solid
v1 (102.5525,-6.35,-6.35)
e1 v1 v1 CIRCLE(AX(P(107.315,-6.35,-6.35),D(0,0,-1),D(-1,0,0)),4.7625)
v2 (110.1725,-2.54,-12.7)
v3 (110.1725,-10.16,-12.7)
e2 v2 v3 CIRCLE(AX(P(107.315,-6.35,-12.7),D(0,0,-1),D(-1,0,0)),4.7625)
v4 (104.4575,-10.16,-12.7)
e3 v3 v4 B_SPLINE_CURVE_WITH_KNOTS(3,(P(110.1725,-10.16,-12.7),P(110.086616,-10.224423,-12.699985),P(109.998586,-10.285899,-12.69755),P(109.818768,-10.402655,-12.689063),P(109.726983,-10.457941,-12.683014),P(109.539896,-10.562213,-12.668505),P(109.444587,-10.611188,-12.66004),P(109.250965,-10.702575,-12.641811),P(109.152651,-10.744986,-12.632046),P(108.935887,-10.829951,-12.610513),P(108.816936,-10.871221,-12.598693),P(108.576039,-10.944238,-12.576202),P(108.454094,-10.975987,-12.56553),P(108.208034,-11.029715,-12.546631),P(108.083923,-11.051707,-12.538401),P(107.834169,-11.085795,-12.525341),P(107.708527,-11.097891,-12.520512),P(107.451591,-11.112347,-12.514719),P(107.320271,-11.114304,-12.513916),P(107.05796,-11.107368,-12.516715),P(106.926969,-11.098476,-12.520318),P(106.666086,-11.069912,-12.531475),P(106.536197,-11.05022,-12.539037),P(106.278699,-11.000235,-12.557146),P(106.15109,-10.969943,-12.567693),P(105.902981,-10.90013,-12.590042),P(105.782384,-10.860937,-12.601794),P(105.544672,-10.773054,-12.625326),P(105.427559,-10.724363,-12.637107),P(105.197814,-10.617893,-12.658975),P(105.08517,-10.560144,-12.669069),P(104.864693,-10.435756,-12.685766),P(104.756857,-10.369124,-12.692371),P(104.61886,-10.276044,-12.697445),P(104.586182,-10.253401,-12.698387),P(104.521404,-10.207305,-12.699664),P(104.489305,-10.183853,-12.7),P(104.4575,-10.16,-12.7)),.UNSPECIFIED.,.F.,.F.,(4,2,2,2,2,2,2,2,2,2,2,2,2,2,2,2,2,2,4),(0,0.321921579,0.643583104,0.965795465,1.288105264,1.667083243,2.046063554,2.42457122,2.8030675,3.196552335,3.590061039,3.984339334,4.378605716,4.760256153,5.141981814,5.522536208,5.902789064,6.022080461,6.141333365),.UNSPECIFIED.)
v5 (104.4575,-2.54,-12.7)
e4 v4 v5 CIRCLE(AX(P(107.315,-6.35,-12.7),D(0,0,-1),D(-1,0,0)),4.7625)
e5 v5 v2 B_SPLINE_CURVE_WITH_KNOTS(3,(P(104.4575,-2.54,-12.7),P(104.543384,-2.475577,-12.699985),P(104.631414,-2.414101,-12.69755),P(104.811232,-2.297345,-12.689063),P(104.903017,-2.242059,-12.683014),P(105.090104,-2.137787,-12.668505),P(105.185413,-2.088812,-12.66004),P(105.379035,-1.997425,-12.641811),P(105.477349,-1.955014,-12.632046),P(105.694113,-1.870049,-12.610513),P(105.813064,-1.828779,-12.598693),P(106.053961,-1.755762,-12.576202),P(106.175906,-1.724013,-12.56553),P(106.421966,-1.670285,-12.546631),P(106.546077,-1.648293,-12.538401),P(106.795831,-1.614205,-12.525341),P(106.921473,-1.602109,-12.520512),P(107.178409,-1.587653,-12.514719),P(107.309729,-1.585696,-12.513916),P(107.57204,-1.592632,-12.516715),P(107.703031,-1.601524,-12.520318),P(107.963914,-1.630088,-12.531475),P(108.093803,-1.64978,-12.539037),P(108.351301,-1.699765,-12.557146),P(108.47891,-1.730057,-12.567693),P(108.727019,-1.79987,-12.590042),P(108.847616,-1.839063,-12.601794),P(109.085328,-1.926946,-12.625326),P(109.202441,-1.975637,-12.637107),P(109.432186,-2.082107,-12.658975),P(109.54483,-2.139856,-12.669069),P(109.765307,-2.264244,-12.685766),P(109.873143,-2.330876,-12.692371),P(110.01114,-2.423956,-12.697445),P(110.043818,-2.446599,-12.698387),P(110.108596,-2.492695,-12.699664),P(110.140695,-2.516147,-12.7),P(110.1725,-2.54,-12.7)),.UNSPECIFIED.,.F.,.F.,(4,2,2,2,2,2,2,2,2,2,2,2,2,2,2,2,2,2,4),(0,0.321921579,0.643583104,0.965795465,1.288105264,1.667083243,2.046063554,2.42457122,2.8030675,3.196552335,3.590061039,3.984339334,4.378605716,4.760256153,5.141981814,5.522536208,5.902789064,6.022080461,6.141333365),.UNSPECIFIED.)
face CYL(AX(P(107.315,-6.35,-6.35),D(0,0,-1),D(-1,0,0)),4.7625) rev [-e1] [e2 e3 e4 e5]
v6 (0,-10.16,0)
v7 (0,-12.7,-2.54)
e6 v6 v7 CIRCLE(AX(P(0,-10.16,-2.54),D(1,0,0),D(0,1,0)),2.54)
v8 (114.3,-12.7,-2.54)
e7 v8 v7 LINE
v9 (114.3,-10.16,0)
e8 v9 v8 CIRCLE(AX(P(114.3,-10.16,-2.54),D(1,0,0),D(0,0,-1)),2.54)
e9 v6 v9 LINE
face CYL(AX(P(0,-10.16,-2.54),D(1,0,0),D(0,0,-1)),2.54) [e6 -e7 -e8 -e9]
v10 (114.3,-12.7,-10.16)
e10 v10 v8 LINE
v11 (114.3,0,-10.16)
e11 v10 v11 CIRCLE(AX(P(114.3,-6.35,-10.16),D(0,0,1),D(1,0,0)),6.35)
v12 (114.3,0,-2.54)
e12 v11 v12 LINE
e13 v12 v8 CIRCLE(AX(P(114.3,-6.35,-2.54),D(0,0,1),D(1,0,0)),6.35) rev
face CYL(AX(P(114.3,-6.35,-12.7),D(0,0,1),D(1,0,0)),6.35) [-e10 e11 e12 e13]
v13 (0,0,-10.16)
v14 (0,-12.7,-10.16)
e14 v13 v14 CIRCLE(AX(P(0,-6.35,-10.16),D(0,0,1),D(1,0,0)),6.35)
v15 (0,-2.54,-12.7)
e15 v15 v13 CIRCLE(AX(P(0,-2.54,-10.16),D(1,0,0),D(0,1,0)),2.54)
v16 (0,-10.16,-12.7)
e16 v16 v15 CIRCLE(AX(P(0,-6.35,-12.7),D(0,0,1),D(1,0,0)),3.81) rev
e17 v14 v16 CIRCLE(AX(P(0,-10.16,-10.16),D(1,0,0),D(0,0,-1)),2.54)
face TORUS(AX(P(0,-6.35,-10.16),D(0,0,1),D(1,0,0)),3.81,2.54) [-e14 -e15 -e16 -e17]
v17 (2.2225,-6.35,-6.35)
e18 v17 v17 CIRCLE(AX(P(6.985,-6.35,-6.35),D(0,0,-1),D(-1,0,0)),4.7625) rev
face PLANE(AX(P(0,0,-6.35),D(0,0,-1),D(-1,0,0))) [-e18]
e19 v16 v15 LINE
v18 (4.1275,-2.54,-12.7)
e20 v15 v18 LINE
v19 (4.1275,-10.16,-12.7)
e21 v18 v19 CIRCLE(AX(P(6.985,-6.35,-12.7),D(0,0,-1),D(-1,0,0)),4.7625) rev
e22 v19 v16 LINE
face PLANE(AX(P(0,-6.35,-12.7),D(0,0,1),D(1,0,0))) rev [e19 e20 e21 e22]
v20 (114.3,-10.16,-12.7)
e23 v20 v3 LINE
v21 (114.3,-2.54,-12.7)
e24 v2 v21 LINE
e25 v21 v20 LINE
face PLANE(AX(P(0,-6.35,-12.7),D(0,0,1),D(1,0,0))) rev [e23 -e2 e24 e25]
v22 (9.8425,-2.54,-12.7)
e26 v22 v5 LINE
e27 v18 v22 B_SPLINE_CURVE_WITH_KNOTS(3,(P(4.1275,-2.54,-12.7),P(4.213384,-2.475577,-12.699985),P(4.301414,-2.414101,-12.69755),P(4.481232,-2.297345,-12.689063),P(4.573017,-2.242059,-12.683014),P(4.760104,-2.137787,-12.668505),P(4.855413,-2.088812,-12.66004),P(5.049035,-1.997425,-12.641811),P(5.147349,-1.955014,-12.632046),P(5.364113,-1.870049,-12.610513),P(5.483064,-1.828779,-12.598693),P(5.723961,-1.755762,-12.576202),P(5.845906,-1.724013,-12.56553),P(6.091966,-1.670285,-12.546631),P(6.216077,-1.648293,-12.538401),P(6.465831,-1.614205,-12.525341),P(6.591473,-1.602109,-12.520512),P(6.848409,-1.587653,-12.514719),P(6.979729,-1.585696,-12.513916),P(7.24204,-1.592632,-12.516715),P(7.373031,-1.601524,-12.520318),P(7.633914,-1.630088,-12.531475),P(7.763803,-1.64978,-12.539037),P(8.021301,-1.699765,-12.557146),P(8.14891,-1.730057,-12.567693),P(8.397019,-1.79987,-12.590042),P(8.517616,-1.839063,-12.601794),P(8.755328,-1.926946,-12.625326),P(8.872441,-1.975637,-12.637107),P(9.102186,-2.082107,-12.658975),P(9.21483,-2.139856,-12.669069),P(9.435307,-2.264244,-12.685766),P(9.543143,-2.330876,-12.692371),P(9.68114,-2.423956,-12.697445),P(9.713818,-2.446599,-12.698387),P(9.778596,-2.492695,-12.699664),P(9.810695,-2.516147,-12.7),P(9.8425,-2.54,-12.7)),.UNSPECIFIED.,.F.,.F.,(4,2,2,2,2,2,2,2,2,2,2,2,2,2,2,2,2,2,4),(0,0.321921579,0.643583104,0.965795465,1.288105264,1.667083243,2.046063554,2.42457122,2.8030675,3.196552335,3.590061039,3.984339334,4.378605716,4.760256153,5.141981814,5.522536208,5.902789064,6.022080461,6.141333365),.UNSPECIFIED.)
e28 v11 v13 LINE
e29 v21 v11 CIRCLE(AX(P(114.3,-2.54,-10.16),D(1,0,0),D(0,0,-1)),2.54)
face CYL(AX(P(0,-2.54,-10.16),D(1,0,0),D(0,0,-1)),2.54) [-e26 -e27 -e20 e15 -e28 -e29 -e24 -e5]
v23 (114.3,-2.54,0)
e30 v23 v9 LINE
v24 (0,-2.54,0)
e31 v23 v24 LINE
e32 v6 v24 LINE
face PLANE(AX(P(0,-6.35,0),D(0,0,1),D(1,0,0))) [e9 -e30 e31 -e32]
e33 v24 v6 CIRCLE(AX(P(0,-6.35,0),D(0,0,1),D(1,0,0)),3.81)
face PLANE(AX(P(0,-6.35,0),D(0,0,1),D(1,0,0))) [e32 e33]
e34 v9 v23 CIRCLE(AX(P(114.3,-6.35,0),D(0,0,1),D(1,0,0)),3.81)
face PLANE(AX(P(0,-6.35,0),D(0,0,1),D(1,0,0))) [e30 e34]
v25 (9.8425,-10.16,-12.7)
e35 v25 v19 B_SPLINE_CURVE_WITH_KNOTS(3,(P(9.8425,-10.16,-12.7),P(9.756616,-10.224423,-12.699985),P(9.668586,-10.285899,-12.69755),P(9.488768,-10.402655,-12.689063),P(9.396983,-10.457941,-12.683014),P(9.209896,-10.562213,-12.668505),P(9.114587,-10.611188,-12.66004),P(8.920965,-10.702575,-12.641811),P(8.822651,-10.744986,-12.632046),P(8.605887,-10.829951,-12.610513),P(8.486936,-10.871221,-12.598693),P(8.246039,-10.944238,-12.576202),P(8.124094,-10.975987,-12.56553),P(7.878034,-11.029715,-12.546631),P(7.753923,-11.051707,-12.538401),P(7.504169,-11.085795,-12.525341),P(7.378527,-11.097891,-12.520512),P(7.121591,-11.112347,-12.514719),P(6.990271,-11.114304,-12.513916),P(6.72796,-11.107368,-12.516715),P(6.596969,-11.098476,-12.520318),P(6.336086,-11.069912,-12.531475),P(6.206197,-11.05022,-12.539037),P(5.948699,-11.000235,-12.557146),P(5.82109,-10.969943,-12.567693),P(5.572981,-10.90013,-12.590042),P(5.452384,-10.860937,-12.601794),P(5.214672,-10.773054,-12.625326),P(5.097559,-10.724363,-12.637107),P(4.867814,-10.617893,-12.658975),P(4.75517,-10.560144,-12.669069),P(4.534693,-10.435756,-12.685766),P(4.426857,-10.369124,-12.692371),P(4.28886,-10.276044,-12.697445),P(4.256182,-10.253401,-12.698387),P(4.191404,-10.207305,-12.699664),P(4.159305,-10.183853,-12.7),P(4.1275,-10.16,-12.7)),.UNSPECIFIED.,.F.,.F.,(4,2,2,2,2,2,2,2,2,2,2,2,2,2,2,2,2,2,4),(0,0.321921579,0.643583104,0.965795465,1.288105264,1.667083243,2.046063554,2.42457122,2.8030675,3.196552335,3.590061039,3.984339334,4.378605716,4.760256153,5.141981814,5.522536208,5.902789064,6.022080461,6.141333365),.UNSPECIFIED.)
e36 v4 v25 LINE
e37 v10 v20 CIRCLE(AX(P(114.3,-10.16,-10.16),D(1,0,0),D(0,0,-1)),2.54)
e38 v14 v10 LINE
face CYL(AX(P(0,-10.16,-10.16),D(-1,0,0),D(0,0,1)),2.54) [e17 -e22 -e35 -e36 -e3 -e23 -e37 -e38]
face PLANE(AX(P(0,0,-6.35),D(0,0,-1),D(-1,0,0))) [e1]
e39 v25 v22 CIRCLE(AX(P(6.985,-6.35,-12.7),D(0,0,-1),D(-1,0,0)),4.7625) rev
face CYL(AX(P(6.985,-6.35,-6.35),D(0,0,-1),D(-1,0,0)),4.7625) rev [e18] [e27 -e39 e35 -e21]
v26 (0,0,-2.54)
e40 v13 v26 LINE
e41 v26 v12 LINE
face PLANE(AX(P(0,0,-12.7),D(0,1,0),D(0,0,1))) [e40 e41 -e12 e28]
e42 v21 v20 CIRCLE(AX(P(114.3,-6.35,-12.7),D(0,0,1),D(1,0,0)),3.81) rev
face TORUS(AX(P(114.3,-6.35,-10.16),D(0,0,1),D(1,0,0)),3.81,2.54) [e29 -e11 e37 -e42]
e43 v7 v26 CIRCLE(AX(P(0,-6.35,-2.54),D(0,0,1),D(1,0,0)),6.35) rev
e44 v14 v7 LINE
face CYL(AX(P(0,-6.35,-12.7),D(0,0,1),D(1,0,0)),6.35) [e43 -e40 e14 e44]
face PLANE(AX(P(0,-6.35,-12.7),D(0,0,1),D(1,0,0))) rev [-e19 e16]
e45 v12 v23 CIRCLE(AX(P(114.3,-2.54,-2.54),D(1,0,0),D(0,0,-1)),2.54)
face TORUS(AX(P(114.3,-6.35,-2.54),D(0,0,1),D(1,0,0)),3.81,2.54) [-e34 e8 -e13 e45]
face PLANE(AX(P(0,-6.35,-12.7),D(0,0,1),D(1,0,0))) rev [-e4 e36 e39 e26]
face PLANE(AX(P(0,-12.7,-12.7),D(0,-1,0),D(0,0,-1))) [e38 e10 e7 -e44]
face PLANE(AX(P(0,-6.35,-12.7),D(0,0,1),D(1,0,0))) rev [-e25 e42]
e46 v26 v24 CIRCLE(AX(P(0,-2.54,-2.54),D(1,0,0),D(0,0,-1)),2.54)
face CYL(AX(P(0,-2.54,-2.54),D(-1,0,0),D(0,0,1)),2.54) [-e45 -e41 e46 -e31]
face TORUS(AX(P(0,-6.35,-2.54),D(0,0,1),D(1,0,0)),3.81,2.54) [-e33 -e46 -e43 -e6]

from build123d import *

# Parameters (mm, degrees)
BOSS_EXTRUDE1_DEPTH = 12.7
SKETCH2_R           = 4.7625
CUT_EXTRUDE1_DEPTH  = 6.35
FILLET1_R           = 2.54


with BuildPart() as part:
    # Sketch1 → Boss-Extrude1 (new body)
    with BuildSketch(Plane.XY):
        with BuildLine():
            Line((0, 0), (114.3, 0))
            ThreePointArc((114.3, 0), (120.65, -6.35), (114.3, -12.7))
            Line((114.3, -12.7), (0, -12.7))
            ThreePointArc((0, -12.7), (-6.35, -6.35), (0, 0))
        make_face()
    extrude(amount=-BOSS_EXTRUDE1_DEPTH)

    # Sketch2 → Cut-Extrude1 (cut)
    with BuildSketch(Plane(origin=(0, 0, -12.7), x_dir=(-1, 0, 0), z_dir=(0, 0, -1))):
        with Locations((-6.985, -6.35)):
            Circle(SKETCH2_R)
        with Locations((-107.315, -6.35)):
            Circle(SKETCH2_R)
    extrude(amount=-CUT_EXTRUDE1_DEPTH, mode=Mode.SUBTRACT)

    # Fillet1
    # the kernel refuses this fillet: 2.54 mm, written as the material it takes off along each edge
    with BuildSketch(Plane(origin=(114.3, -6.35, -12.7), x_dir=(0, 1, 0), z_dir=(-1, 0, 0))) as fillet1_piece_1:
        with BuildLine():
            CenterArc((6.35 - FILLET1_R, -FILLET1_R), FILLET1_R, 0, 90)
            Line((6.35 - FILLET1_R, 0), (6.35, 0))
            Line((6.35, 0), (6.35, -FILLET1_R))
        make_face()
    revolve(axis=Axis((114.3, -6.35, -12.7), (0, 0, -1)), revolution_arc=180, mode=Mode.SUBTRACT)
    with BuildSketch(Plane(origin=(0, 0, -12.7), x_dir=(0, -1, 0), z_dir=(1, 0, 0)), Plane(origin=(114.3, -12.7, 0), x_dir=(0, 0, -1), z_dir=(-1, 0, 0))) as fillet1_piece_2:
        with BuildLine():
            CenterArc((FILLET1_R, -FILLET1_R), FILLET1_R, 90, 90)
            Line((0, -FILLET1_R), (0, 0))
            Line((0, 0), (FILLET1_R, 0))
        make_face()
    extrude(amount=114.3, mode=Mode.SUBTRACT)
    with BuildSketch(Plane(origin=(0, -6.35, -12.7), x_dir=(0, -1, 0), z_dir=(1, 0, 0))) as fillet1_piece_3:
        with BuildLine():
            CenterArc((6.35 - FILLET1_R, -FILLET1_R), FILLET1_R, 0, 90)
            Line((6.35 - FILLET1_R, 0), (6.35, 0))
            Line((6.35, 0), (6.35, -FILLET1_R))
        make_face()
    revolve(axis=Axis((0, -6.35, -12.7), (0, 0, -1)), revolution_arc=180, mode=Mode.SUBTRACT)
    with BuildSketch(Plane(origin=(0, 0, 0), x_dir=(0, -1, 0), z_dir=(1, 0, 0)), Plane(origin=(114.3, -12.7, -12.7), x_dir=(0, 0, 1), z_dir=(-1, 0, 0))) as fillet1_piece_4:
        with BuildLine():
            CenterArc((FILLET1_R, FILLET1_R), FILLET1_R, 180, 90)
            Line((0, FILLET1_R), (0, 0))
            Line((0, 0), (FILLET1_R, 0))
        make_face()
    extrude(amount=114.3, mode=Mode.SUBTRACT)
    with BuildSketch(Plane(origin=(114.3, -6.35, 0), x_dir=(0, 1, 0), z_dir=(-1, 0, 0))) as fillet1_piece_5:
        with BuildLine():
            CenterArc((6.35 - FILLET1_R, FILLET1_R), FILLET1_R, 270, 90)
            Line((6.35 - FILLET1_R, 0), (6.35, 0))
            Line((6.35, 0), (6.35, FILLET1_R))
        make_face()
    revolve(axis=Axis((114.3, -6.35, 0), (0, 0, -1)), revolution_arc=180, mode=Mode.SUBTRACT)
    with BuildSketch(Plane(origin=(0, -6.35, 0), x_dir=(0, -1, 0), z_dir=(1, 0, 0))) as fillet1_piece_6:
        with BuildLine():
            CenterArc((6.35 - FILLET1_R, FILLET1_R), FILLET1_R, 270, 90)
            Line((6.35 - FILLET1_R, 0), (6.35, 0))
            Line((6.35, 0), (6.35, FILLET1_R))
        make_face()
    revolve(axis=Axis((0, -6.35, 0), (0, 0, -1)), revolution_arc=180, mode=Mode.SUBTRACT)


solid = part.part
